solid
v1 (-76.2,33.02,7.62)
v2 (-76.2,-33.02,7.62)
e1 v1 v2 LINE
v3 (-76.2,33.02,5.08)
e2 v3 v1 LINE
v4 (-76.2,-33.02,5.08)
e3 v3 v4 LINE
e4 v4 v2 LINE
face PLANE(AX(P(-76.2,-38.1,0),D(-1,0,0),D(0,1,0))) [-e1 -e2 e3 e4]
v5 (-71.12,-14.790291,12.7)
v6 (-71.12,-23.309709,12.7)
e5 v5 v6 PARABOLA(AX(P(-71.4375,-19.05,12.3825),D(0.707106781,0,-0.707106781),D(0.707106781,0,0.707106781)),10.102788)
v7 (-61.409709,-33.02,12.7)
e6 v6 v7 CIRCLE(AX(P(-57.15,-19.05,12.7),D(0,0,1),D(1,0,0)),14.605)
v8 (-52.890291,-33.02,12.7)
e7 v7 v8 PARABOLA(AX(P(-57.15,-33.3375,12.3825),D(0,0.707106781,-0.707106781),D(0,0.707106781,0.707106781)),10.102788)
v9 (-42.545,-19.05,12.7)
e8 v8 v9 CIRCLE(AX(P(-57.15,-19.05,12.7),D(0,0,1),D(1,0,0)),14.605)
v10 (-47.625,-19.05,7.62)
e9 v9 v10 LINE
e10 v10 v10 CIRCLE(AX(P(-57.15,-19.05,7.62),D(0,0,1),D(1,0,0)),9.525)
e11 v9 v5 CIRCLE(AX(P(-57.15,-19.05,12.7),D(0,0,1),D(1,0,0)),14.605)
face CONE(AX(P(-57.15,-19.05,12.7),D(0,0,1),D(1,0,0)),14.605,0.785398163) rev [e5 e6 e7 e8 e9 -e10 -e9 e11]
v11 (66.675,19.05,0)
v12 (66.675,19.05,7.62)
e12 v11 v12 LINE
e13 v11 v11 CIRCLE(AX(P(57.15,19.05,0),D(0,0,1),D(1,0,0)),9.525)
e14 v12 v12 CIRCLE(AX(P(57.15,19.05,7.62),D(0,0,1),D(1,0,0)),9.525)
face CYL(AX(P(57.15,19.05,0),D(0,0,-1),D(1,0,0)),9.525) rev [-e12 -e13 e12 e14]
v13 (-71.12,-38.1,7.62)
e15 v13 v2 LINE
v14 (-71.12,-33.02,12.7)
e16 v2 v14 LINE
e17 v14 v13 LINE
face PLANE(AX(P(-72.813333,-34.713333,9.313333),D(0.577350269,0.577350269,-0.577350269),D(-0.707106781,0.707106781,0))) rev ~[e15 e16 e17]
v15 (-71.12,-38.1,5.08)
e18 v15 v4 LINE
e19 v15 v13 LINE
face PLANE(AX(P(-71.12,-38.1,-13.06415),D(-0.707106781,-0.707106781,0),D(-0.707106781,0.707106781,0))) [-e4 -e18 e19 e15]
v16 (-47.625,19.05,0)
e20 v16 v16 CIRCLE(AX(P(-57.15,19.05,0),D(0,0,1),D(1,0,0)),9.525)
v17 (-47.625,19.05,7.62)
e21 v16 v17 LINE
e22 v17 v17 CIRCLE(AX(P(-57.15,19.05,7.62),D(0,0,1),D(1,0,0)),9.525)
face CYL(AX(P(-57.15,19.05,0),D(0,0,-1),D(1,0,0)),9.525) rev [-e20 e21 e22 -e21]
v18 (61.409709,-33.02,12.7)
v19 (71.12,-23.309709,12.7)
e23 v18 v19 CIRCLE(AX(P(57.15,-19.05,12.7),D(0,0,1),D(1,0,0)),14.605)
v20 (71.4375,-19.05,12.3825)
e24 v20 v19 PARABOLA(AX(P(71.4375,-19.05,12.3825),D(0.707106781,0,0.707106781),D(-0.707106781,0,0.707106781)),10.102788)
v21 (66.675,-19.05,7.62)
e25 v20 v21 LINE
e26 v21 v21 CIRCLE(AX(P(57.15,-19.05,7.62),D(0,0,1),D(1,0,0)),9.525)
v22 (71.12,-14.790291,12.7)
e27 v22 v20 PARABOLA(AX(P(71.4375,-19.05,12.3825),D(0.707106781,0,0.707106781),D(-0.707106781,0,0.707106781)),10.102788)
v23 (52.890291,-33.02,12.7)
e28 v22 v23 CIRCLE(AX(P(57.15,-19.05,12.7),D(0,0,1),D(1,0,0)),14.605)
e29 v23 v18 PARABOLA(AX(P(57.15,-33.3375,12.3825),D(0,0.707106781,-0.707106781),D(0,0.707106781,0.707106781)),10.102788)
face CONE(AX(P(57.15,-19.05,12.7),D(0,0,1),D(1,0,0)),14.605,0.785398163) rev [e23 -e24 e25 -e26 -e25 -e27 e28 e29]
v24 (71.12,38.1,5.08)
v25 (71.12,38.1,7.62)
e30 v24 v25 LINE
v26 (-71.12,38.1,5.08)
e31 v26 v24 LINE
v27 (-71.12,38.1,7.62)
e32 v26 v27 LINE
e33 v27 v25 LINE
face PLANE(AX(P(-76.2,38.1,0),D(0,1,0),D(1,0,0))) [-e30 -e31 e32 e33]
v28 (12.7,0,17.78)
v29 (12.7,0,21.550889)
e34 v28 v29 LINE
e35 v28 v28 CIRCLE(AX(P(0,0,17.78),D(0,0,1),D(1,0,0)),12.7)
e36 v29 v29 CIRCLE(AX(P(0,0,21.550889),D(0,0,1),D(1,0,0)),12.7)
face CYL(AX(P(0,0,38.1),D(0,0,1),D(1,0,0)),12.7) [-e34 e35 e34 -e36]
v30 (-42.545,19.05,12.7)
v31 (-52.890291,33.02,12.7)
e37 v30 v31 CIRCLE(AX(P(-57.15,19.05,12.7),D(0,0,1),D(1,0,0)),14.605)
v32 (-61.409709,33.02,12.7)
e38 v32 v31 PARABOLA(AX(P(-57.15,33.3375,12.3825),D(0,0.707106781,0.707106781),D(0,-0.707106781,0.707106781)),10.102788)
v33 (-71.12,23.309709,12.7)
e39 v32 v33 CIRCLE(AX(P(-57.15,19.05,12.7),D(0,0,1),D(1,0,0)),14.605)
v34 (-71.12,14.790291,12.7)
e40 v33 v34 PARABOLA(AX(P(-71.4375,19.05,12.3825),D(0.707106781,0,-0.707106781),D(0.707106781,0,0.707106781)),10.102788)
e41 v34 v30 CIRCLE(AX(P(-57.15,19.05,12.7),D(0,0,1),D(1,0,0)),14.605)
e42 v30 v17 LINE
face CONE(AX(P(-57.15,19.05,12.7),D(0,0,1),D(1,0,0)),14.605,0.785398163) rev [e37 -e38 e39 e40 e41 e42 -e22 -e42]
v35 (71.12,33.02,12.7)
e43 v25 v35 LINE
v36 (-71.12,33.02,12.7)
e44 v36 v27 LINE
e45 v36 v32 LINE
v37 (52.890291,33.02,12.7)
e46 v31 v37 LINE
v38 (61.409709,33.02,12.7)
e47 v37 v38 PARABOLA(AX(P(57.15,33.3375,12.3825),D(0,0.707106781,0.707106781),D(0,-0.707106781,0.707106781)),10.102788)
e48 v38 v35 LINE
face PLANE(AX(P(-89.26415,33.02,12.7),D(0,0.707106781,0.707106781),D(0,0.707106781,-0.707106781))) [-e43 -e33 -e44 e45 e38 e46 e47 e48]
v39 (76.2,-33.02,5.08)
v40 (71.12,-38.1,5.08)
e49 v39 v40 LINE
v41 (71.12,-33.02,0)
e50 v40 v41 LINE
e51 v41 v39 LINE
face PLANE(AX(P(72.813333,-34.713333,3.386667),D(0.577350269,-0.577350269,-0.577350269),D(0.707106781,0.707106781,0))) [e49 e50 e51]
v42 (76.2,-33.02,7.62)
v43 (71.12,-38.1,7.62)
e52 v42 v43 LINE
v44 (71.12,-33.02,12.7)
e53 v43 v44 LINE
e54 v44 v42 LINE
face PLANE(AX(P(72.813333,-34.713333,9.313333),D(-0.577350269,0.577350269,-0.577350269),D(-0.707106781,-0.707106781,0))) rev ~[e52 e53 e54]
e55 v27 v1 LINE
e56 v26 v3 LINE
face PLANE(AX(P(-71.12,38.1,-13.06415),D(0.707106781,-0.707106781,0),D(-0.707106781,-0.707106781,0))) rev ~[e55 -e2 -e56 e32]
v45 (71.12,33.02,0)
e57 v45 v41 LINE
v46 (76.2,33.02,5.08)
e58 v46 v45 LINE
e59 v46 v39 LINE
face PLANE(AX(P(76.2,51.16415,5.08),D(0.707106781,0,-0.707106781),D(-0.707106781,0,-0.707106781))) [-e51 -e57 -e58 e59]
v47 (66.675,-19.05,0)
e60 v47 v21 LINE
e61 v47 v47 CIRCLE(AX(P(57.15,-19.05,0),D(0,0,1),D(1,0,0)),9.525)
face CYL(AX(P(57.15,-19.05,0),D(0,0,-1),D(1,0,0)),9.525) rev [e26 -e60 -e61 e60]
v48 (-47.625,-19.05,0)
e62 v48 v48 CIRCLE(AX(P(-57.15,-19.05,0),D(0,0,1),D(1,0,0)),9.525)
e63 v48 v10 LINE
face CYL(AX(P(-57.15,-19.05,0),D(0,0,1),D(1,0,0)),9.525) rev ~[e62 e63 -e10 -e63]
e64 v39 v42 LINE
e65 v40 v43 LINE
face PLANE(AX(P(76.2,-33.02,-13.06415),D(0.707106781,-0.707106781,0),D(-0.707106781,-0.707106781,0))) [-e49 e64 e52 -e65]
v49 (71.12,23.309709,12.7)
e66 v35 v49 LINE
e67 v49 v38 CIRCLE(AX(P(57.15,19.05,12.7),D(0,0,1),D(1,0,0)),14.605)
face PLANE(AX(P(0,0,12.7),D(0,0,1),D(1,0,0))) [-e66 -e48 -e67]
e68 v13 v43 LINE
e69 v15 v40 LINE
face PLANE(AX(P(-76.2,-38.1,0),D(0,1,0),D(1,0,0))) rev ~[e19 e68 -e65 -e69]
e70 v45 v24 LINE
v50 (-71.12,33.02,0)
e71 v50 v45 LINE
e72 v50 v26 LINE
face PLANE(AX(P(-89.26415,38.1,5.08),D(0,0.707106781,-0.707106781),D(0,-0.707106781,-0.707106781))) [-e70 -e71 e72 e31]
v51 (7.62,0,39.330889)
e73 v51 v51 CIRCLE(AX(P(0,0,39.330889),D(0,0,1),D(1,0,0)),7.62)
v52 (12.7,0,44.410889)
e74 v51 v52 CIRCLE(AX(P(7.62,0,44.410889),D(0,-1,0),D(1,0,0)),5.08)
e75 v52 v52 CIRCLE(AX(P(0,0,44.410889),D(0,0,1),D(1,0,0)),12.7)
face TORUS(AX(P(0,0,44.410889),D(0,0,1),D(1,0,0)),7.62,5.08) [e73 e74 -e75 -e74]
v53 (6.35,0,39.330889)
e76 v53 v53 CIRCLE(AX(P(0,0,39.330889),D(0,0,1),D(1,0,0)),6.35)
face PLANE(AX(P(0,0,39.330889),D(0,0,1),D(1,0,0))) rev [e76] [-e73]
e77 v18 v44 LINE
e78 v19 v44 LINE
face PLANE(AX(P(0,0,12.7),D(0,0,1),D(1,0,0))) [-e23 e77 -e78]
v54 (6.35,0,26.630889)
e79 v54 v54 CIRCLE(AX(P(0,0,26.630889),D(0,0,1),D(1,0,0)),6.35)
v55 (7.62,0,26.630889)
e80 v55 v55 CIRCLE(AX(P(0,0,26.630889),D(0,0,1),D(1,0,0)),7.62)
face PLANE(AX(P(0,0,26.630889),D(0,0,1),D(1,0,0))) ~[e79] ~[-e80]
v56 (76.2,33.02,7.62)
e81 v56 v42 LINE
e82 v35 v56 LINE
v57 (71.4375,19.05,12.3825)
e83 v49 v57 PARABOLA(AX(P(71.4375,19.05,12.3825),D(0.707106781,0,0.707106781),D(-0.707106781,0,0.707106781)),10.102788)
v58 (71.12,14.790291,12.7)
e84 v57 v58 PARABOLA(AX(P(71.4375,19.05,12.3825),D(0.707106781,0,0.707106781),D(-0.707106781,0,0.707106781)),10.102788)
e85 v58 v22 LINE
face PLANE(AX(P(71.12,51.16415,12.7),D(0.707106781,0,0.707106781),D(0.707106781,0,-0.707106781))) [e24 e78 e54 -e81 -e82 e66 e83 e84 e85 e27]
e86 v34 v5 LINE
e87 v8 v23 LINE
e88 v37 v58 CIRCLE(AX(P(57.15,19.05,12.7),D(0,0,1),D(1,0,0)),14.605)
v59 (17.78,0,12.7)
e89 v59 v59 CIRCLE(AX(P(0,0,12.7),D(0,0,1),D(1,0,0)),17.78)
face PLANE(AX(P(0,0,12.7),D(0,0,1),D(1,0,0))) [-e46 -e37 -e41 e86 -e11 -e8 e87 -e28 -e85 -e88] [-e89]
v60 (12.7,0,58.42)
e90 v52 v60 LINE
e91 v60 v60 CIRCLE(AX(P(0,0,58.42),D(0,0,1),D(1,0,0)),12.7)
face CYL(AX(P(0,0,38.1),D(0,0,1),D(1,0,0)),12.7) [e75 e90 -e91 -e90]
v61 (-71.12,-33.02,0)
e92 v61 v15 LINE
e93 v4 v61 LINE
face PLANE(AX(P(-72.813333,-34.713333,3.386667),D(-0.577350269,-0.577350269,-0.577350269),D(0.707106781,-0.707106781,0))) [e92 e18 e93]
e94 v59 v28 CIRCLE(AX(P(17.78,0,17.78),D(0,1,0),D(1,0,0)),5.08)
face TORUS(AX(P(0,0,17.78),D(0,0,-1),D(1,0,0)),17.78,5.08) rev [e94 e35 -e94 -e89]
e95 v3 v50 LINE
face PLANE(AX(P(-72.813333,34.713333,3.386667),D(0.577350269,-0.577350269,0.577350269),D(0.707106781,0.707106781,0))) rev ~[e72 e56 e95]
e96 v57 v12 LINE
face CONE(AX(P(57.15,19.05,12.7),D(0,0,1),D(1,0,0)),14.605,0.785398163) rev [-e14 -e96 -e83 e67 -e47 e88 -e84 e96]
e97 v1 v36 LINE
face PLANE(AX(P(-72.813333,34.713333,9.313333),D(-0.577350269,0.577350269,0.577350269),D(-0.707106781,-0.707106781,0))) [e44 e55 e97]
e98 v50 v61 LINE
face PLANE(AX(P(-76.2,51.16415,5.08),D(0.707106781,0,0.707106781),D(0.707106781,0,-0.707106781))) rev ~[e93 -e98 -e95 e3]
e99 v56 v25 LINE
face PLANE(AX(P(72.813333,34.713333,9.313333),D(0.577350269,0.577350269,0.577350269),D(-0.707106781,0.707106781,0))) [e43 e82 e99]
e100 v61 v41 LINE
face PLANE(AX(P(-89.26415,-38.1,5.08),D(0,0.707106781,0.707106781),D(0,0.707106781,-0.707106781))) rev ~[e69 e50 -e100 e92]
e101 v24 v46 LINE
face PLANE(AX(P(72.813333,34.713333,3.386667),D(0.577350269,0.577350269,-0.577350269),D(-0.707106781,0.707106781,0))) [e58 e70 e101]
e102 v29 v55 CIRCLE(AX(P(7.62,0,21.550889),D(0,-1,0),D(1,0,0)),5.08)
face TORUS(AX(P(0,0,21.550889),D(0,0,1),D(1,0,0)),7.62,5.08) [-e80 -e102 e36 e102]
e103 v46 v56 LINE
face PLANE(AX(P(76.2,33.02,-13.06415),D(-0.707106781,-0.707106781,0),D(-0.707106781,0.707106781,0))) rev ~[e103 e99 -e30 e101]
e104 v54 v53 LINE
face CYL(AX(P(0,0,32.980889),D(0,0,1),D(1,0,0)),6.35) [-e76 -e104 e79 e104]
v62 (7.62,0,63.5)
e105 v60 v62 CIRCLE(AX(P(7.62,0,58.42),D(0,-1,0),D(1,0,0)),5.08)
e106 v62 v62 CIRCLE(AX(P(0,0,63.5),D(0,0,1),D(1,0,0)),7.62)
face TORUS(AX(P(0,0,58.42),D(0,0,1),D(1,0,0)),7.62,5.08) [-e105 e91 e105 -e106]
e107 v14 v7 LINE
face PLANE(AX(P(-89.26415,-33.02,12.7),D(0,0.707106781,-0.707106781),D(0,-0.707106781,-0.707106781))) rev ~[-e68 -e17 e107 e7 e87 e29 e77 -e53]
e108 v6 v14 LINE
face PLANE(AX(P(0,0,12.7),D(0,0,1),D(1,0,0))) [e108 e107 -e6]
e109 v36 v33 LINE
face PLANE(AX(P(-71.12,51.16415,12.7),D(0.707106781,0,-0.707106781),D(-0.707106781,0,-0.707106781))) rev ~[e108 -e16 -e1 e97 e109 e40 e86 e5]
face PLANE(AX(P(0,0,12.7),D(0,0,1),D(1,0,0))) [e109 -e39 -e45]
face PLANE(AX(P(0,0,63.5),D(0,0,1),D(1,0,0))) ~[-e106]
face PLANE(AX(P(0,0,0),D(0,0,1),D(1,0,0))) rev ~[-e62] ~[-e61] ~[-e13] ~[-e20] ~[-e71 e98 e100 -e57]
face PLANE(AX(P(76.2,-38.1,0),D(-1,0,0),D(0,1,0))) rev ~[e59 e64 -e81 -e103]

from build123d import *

# Parameters (mm, degrees)
F0_W         = 152.4
F0_H         = 76.2
F1_DEPTH     = 12.7
F2_R         = 9.525
F3_DEPTH     = 12.7
F4_W         = 12.7
F4_H         = 50.8
F6_W         = 7.62
F6_H         = 12.7
F8_R         = 5.08
F9_T1_DEPTH  = 6.4524666085
F9_T3_DEPTH  = 6.4524666085
F9_T5_DEPTH  = 6.4524666085
F9_T7_DEPTH  = 6.4524666085
F9_T9_DEPTH  = 6.4524666085
F9_T11_DEPTH = 6.4524666085
F9_T13_DEPTH = 6.4524666085
F9_T15_DEPTH = 6.4524666085
F9_T17_DEPTH = 102.3282991577
F9_T19_DEPTH = 178.5282991577
F9_T21_DEPTH = 38.8282991577


# Not quite as in the source:
# - a fillet or chamfer that OpenCascade refuses, or shapes differently, is made with other operations: its cross-section is extruded or revolved along the edge and cut away or added


with BuildPart() as f1:
    # F0 (on Top) → F1 (new body)
    with BuildSketch(Plane.XY):
        Rectangle(F0_W, F0_H)
    extrude(amount=F1_DEPTH)

    # F2 (on Top) → F3 (cut, symmetric)
    with BuildSketch(Plane.XY):
        with Locations((-57.15, 19.05)):
            Circle(F2_R)
        with Locations((57.15, 19.05)):
            Circle(F2_R)
        with Locations((57.15, -19.05)):
            Circle(F2_R)
        with Locations((-57.15, -19.05)):
            Circle(F2_R)
    extrude(amount=F3_DEPTH, both=True, mode=Mode.SUBTRACT)

    # F4 (on Front) → F5 (revolve)
    with BuildSketch(Plane.XZ):
        with Locations((6.35, 38.1)):
            Rectangle(F4_W, F4_H)
    revolve(axis=Axis((0, 0, 38.1), (0, 0, 1)))

    # F6 (on Front) → F7 (revolve, cut)
    with BuildSketch(Plane.XZ):
        with Locations((10.16, 32.980889082)):
            Rectangle(F6_W, F6_H)
    revolve(axis=Axis((0, 0, 12.7), (0, 0, 1)), mode=Mode.SUBTRACT)

    # F8
    f8_edges = [f1.edges().sort_by_distance(p)[0] for p in [
        (-12.7, 0, 12.7),
        (-12.7, 0, 63.5),
        (-12.7, 0, 26.630889),
        (-12.7, 0, 39.330889),
    ]]
    fillet(f8_edges, radius=F8_R)

    # F9: chamfer of 5.08 on 17 edges, made by hand

    # F9_s2 → F9_t1 (cut)
    with BuildSketch(Plane(origin=(38.9466666667, -38.9466666667, 38.9466666667), x_dir=(0.7071067812, 0.7071067812, 0), z_dir=(0.5773502692, -0.5773502692, 0.5773502692))):
        Polygon((26.9407683632, -32.1454703911), (30.5328708116, -38.3671743378), (23.3486659148, -38.3671743378), align=None)
    extrude(amount=F9_T1_DEPTH, mode=Mode.SUBTRACT)

    # F9_s4 → F9_t3 (cut)
    with BuildSketch(Plane(origin=(38.9466666667, 38.9466666667, 38.9466666667), x_dir=(-0.7071067812, 0.7071067812, 0), z_dir=(0.5773502692, 0.5773502692, 0.5773502692))):
        Polygon((-26.9407683632, -32.1454703911), (-30.5328708116, -38.3671743378), (-23.3486659148, -38.3671743378), align=None)
    extrude(amount=F9_T3_DEPTH, mode=Mode.SUBTRACT)

    # F9_s6 → F9_t5 (cut)
    with BuildSketch(Plane(origin=(-38.9466666667, -38.9466666667, 38.9466666667), x_dir=(0.7071067812, -0.7071067812, 0), z_dir=(-0.5773502692, -0.5773502692, 0.5773502692))):
        Polygon((-26.9407683632, -32.1454703911), (-23.3486659148, -38.3671743378), (-30.5328708116, -38.3671743378), align=None)
    extrude(amount=F9_T5_DEPTH, mode=Mode.SUBTRACT)

    # F9_s8 → F9_t7 (cut)
    with BuildSketch(Plane(origin=(-38.9466666667, 38.9466666667, 38.9466666667), x_dir=(-0.7071067812, -0.7071067812, 0), z_dir=(-0.5773502692, 0.5773502692, 0.5773502692))):
        Polygon((26.9407683632, -32.1454703911), (23.3486659148, -38.3671743378), (30.5328708116, -38.3671743378), align=None)
    extrude(amount=F9_T7_DEPTH, mode=Mode.SUBTRACT)

    # F9_s10 → F9_t9 (cut)
    with BuildSketch(Plane(origin=(-34.7133333333, -34.7133333333, -34.7133333333), x_dir=(0.7071067812, -0.7071067812, 0), z_dir=(-0.5773502692, -0.5773502692, -0.5773502692))):
        Polygon((-26.9407683632, 42.5149769689), (-23.3486659148, 48.7366809156), (-30.5328708116, 48.7366809156), align=None)
    extrude(amount=F9_T9_DEPTH, mode=Mode.SUBTRACT)

    # F9_s12 → F9_t11 (cut)
    with BuildSketch(Plane(origin=(34.7133333333, -34.7133333333, -34.7133333333), x_dir=(0.7071067812, 0.7071067812, 0), z_dir=(0.5773502692, -0.5773502692, -0.5773502692))):
        Polygon((26.9407683632, 42.5149769689), (30.5328708116, 48.7366809156), (23.3486659148, 48.7366809156), align=None)
    extrude(amount=F9_T11_DEPTH, mode=Mode.SUBTRACT)

    # F9_s14 → F9_t13 (cut)
    with BuildSketch(Plane(origin=(34.7133333333, 34.7133333333, -34.7133333333), x_dir=(-0.7071067812, 0.7071067812, 0), z_dir=(0.5773502692, 0.5773502692, -0.5773502692))):
        Polygon((-30.5328708116, 48.7366809156), (-26.9407683632, 42.5149769689), (-23.3486659148, 48.7366809156), align=None)
    extrude(amount=F9_T13_DEPTH, mode=Mode.SUBTRACT)

    # F9_s16 → F9_t15 (cut)
    with BuildSketch(Plane(origin=(-34.7133333333, 34.7133333333, -34.7133333333), x_dir=(-0.7071067812, -0.7071067812, 0), z_dir=(-0.5773502692, 0.5773502692, -0.5773502692))):
        Polygon((26.9407683632, 42.5149769689), (23.3486659148, 48.7366809156), (30.5328708116, 48.7366809156), align=None)
    extrude(amount=F9_T15_DEPTH, mode=Mode.SUBTRACT)

    # F9_s18 → F9_t17 (cut)
    with BuildSketch(Plane.XZ.offset(-51.1641495789)):
        Polygon((71.12, 12.7), (76.2, 7.62), (76.2, 12.7), align=None)
        Polygon((-71.12, 12.7), (-76.2, 7.62), (-76.2, 12.7), align=None)
        Polygon((-76.2, 5.08), (-71.12, 0), (-76.2, 0), align=None)
        Polygon((76.2, 5.08), (71.12, 0), (76.2, 0), align=None)
    extrude(amount=F9_T17_DEPTH, mode=Mode.SUBTRACT)

    # F9_s20 → F9_t19 (cut)
    with BuildSketch(Plane.YZ.offset(-89.2641495789)):
        Polygon((-33.02, 12.7), (-38.1, 7.62), (-38.1, 12.7), align=None)
        Polygon((33.02, 12.7), (38.1, 7.62), (38.1, 12.7), align=None)
        Polygon((-38.1, 5.08), (-33.02, 0), (-38.1, 0), align=None)
        Polygon((38.1, 5.08), (33.02, 0), (38.1, 0), align=None)
    extrude(amount=F9_T19_DEPTH, mode=Mode.SUBTRACT)

    # F9_s22 → F9_t21 (cut)
    with BuildSketch(Plane.XY.offset(-13.0641495789)):
        Polygon((-71.12, 38.1), (-76.2, 33.02), (-76.2, 38.1), align=None)
        Polygon((-71.12, -38.1), (-76.2, -33.02), (-76.2, -38.1), align=None)
        Polygon((76.2, -33.02), (71.12, -38.1), (76.2, -38.1), align=None)
        Polygon((76.2, 33.02), (71.12, 38.1), (76.2, 38.1), align=None)
    extrude(amount=F9_T21_DEPTH, mode=Mode.SUBTRACT)

    # F9_s23 → F9_t24 (revolve, cut)
    with BuildSketch(Plane.XZ.offset(19.05)):
        Polygon((-42.545, 12.7), (-47.625, 7.62), (-47.625, 12.7), align=None)
    revolve(axis=Axis((-57.15, -19.05, 12.7), (0, 0, 1)), mode=Mode.SUBTRACT)

    # F9_s25 → F9_t26 (revolve, cut)
    with BuildSketch(Plane.XZ.offset(19.05)):
        Polygon((71.755, 12.7), (66.675, 7.62), (66.675, 12.7), align=None)
    revolve(axis=Axis((57.15, -19.05, 12.7), (0, 0, 1)), mode=Mode.SUBTRACT)

    # F9_s27 → F9_t28 (revolve, cut)
    with BuildSketch(Plane.XZ.offset(-19.05)):
        Polygon((-42.545, 12.7), (-47.625, 7.62), (-47.625, 12.7), align=None)
    revolve(axis=Axis((-57.15, 19.05, 12.7), (0, 0, 1)), mode=Mode.SUBTRACT)

    # F9_s29 → F9_t30 (revolve, cut)
    with BuildSketch(Plane.XZ.offset(-19.05)):
        Polygon((71.755, 12.7), (66.675, 7.62), (66.675, 12.7), align=None)
    revolve(axis=Axis((57.15, 19.05, 12.7), (0, 0, 1)), mode=Mode.SUBTRACT)


solid = f1.part
